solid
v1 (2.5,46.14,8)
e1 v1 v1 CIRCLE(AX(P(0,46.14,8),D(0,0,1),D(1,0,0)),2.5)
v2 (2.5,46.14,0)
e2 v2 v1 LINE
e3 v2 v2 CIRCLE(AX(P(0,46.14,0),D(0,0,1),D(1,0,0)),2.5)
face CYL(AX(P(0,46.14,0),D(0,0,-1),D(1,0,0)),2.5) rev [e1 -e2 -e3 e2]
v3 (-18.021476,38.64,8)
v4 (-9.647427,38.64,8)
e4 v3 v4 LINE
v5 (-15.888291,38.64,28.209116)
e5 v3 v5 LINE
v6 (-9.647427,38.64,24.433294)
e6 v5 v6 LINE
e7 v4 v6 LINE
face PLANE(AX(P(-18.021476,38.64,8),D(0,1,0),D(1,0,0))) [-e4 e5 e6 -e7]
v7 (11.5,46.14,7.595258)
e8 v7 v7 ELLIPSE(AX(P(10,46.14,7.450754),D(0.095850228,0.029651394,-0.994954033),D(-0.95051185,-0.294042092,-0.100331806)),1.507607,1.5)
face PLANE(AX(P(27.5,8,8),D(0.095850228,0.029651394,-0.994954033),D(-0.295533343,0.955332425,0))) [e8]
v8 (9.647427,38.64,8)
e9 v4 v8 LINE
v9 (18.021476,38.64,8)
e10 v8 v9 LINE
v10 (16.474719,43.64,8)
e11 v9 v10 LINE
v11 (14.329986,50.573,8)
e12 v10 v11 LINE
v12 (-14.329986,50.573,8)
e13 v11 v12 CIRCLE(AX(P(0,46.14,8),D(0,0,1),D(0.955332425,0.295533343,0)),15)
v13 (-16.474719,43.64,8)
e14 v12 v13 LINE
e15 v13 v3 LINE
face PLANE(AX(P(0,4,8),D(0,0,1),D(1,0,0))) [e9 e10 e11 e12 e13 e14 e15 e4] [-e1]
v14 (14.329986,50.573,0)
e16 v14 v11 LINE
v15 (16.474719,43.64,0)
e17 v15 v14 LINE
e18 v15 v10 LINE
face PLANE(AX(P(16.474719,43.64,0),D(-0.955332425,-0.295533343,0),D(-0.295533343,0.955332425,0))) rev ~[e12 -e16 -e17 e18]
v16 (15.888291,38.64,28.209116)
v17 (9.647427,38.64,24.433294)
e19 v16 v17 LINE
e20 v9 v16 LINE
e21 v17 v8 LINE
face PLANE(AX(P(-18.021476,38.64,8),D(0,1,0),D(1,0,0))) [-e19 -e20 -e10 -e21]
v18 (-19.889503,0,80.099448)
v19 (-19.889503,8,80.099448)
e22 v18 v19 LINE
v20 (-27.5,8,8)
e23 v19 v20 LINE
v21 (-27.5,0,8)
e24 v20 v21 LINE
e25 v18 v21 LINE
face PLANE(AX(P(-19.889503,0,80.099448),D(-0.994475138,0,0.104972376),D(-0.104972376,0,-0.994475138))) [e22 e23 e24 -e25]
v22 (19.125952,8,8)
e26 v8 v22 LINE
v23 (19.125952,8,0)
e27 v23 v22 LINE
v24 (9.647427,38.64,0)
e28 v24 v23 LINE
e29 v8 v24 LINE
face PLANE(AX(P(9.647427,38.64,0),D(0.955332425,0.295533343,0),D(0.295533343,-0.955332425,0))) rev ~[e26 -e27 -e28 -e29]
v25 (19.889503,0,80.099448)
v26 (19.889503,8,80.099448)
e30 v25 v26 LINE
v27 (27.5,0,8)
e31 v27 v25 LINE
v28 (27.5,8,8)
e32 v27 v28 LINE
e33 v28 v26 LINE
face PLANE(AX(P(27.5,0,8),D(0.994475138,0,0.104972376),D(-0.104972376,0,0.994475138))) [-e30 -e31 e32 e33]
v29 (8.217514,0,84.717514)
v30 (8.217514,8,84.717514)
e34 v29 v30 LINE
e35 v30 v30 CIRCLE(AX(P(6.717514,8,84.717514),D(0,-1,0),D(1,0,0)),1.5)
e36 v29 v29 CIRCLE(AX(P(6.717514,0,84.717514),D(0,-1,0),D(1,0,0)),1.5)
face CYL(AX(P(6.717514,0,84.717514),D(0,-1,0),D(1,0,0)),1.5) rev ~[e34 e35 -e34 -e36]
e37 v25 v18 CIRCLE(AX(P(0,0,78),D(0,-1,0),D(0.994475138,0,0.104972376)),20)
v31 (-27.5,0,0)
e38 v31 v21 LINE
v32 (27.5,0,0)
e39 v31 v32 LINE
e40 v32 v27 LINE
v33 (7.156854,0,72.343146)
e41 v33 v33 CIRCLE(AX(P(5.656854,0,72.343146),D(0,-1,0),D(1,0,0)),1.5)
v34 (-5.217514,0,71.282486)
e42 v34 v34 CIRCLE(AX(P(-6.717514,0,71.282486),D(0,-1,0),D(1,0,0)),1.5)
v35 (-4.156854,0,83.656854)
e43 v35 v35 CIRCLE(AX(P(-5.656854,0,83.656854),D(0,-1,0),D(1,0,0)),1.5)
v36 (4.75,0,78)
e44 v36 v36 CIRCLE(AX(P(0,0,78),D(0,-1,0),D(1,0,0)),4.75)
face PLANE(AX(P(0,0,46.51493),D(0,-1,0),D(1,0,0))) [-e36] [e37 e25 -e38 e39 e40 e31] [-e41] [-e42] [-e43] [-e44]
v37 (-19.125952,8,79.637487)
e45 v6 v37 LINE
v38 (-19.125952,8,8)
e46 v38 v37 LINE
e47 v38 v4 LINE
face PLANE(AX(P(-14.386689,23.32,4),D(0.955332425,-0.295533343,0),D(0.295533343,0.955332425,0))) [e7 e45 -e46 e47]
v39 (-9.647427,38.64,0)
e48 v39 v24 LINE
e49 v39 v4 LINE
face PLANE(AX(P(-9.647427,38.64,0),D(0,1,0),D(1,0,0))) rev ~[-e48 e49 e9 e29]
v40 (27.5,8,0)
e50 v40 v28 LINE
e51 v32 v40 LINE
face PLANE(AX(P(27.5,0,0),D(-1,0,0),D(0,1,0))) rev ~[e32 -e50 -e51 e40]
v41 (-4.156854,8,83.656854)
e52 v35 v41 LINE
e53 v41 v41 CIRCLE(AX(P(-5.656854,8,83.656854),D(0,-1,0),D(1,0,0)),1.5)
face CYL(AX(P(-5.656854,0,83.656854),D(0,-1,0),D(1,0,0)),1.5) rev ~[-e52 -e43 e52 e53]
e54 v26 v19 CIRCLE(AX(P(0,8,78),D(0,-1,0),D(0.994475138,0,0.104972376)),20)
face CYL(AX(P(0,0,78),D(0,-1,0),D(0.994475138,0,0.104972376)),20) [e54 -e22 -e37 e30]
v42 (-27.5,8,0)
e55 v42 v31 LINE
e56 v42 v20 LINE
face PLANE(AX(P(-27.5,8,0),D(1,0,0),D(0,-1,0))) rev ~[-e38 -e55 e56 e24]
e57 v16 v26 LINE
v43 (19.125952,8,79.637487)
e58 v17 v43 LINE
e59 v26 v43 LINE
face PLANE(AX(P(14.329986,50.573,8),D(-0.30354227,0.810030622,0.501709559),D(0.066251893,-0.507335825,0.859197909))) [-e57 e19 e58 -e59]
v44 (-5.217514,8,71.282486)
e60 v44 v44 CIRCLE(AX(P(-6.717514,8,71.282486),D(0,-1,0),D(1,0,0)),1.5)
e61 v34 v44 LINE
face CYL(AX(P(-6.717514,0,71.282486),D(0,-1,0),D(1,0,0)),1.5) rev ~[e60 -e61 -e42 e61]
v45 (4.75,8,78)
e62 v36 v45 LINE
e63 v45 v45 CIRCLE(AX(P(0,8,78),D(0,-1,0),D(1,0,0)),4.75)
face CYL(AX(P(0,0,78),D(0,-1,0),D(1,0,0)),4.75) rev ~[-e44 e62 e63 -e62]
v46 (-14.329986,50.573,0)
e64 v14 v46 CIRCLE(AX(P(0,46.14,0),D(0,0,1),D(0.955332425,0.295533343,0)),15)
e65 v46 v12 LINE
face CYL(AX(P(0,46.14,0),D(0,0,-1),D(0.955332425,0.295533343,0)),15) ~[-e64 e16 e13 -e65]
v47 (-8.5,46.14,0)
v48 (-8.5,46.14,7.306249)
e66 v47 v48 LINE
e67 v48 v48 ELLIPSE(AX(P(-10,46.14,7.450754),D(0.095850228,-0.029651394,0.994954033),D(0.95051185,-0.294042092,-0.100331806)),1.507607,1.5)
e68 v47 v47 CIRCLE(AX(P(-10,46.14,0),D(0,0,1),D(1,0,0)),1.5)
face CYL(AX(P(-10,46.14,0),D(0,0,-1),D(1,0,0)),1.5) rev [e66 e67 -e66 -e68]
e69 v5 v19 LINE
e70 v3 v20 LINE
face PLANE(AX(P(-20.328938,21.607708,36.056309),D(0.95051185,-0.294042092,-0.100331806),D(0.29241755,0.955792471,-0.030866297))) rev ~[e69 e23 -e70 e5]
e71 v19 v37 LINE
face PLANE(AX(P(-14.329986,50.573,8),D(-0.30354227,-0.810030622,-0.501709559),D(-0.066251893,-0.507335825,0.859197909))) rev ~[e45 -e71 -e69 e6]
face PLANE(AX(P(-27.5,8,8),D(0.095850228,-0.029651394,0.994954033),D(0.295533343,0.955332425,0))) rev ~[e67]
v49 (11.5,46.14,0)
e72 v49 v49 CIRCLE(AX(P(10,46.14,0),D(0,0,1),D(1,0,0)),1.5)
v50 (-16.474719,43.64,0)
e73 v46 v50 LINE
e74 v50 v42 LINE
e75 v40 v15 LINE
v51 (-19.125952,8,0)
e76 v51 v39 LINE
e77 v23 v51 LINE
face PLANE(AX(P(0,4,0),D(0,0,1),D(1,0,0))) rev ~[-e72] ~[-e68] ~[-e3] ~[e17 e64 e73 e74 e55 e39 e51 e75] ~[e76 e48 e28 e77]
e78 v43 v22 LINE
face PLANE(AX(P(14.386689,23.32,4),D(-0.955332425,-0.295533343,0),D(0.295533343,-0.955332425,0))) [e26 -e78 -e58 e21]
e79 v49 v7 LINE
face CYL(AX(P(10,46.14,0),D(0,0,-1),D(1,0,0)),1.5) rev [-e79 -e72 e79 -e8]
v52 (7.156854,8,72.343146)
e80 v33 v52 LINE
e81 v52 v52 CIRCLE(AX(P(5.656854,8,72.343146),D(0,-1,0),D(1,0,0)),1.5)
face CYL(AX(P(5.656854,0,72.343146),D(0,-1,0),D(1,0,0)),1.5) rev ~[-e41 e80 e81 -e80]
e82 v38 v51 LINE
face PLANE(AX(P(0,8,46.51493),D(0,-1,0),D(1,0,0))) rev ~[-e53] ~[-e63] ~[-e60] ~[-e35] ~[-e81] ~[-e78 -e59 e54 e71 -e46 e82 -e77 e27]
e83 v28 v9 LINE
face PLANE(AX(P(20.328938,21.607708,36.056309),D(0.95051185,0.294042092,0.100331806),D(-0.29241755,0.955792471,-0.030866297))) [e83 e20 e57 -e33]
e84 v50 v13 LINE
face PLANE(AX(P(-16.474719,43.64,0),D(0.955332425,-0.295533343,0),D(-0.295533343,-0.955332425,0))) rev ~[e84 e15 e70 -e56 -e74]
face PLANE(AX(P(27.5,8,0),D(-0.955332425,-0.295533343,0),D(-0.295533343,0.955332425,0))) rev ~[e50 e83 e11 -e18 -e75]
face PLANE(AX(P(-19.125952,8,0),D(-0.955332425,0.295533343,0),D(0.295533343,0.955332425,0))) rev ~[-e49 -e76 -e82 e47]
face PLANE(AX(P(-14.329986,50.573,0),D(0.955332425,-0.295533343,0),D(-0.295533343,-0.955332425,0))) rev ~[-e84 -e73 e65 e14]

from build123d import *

# Parameters (mm, degrees)
F0_R      = 1.5
F0_R_2    = 2.5
F1_DEPTH  = 8
F2_W      = 55
F2_H      = 8
F3_DEPTH  = 8
F4_R      = 4.75
F4_R_2    = 1.5
F5_DEPTH  = 8
F8_REACH  = 140.1940387091
F11_REACH = 140.1940387091
F13_DEPTH = 25


with BuildPart() as f1:
    # F0 (on Top) → F1 (new body)
    with BuildSketch(Plane.XY):
        Polygon((-27.5, 8), (-27.5, 0), (27.5, 0), (27.5, 8), (19.1259515677, 8), (-19.1259515677, 8), align=None)
        with BuildLine():
            Line((-16.4747191004, 43.64), (-27.5, 8))
            Line((-27.5, 8), (-19.1259515677, 8))
            Line((-19.1259515677, 8), (-9.6474272477, 38.64))
            Line((-9.6474272477, 38.64), (9.6474272477, 38.64))
            Line((9.6474272477, 38.64), (19.1259515677, 8))
            Line((19.1259515677, 8), (27.5, 8))
            Line((27.5, 8), (16.4747191004, 43.64))
            Line((16.4747191004, 43.64), (14.3299863823, 50.5730001446))
            ThreePointArc((14.3299863823, 50.5730001446), (0, 61.14), (-14.3299863823, 50.5730001446))
            Line((-14.3299863823, 50.5730001446), (-16.4747191004, 43.64))
        make_face()
        with Locations((-10, 46.14)):
            Circle(F0_R, mode=Mode.SUBTRACT)
        with Locations((0, 46.14)):
            Circle(F0_R_2, mode=Mode.SUBTRACT)
        with Locations((10, 46.14)):
            Circle(F0_R, mode=Mode.SUBTRACT)
    extrude(amount=F1_DEPTH)

    # F2 (on face) → F3 (join)
    with BuildSketch(Plane.XZ):
        with BuildLine():
            Line((27.5, 8), (19.8895027624, 80.0994475138))
            ThreePointArc((19.8895027624, 80.0994475138), (0, 98), (-19.8895027624, 80.0994475138))
            Line((-19.8895027624, 80.0994475138), (-27.5, 8))
            Line((-27.5, 8), (27.5, 8))
        make_face()
        with Locations((0, 4)):
            Rectangle(F2_W, F2_H)
    extrude(amount=-F3_DEPTH)

    # F4 (on face) → F5 (cut, through all)
    with BuildSketch(Plane.XZ):
        with Locations((0, 78)):
            Circle(F4_R)
        with Locations((-5.6568542495, 83.6568542495)):
            Circle(F4_R_2)
        with Locations((6.7175144213, 84.7175144213)):
            Circle(F4_R_2)
        with Locations((5.6568542495, 72.3431457505)):
            Circle(F4_R_2)
        with Locations((-6.7175144213, 71.2824855787)):
            Circle(F4_R_2)
    extrude(amount=-F5_DEPTH, mode=Mode.SUBTRACT)

    f8_end = Plane(origin=(14.3866894077, 23.32, 4), x_dir=(0.295533343, -0.9553324255, 0), z_dir=(-0.9553324255, -0.295533343, 0))
    # F7 (on 3pt) → F8 (join, up to a plane its end follows)
    with BuildSketch(Plane(origin=(27.8443578743, 8.6136887495, 2.9391266645), x_dir=(-0.2924175497, 0.9557924714, -0.0308662969), z_dir=(0.95051185, 0.2940420916, 0.1003318064))):
        Polygon((-0.6420732198, 77.5690607735), (-0.6420732198, 5.0690607735), (43.900022914, 6.4515483908), align=None)
    f8_long = extrude(amount=-F8_REACH, mode=Mode.PRIVATE)
    add(split(f8_long, bisect_by=f8_end, keep=Keep.BOTTOM, mode=Mode.PRIVATE))

    f11_end = Plane(origin=(-14.3866894077, 23.32, 4), x_dir=(0.295533343, 0.9553324255, 0), z_dir=(0.9553324255, -0.295533343, 0))
    # F10 (on 3pt) → F11 (join, up to a plane its end follows)
    with BuildSketch(Plane(origin=(-27.8443578743, 8.6136887495, 2.9391266645), x_dir=(0.2924175497, 0.9557924714, -0.0308662969), z_dir=(0.95051185, -0.2940420916, -0.1003318064))):
        Polygon((-0.6420732198, 77.5690607735), (-0.6420732198, 5.0690607735), (43.900022914, 6.4515483908), align=None)
    f11_long = extrude(amount=F11_REACH, mode=Mode.PRIVATE)
    add(split(f11_long, bisect_by=f11_end, keep=Keep.BOTTOM, mode=Mode.PRIVATE))

    # F12 (on face) → F13 (cut)
    with BuildSketch(Plane.XY.offset(8)):
        with BuildLine():
            Line((-18.02147568, 38.64), (-9.6474272477, 38.64))
            Line((-9.6474272477, 38.64), (9.6474272477, 38.64))
            Line((9.6474272477, 38.64), (18.02147568, 38.64))
            Line((18.02147568, 38.64), (14.3299863823, 50.5730001446))
            ThreePointArc((14.3299863823, 50.5730001446), (0, 61.14), (-14.3299863823, 50.5730001446))
            Line((-14.3299863823, 50.5730001446), (-18.02147568, 38.64))
        make_face()
    extrude(amount=F13_DEPTH, mode=Mode.SUBTRACT)


solid = f1.part
